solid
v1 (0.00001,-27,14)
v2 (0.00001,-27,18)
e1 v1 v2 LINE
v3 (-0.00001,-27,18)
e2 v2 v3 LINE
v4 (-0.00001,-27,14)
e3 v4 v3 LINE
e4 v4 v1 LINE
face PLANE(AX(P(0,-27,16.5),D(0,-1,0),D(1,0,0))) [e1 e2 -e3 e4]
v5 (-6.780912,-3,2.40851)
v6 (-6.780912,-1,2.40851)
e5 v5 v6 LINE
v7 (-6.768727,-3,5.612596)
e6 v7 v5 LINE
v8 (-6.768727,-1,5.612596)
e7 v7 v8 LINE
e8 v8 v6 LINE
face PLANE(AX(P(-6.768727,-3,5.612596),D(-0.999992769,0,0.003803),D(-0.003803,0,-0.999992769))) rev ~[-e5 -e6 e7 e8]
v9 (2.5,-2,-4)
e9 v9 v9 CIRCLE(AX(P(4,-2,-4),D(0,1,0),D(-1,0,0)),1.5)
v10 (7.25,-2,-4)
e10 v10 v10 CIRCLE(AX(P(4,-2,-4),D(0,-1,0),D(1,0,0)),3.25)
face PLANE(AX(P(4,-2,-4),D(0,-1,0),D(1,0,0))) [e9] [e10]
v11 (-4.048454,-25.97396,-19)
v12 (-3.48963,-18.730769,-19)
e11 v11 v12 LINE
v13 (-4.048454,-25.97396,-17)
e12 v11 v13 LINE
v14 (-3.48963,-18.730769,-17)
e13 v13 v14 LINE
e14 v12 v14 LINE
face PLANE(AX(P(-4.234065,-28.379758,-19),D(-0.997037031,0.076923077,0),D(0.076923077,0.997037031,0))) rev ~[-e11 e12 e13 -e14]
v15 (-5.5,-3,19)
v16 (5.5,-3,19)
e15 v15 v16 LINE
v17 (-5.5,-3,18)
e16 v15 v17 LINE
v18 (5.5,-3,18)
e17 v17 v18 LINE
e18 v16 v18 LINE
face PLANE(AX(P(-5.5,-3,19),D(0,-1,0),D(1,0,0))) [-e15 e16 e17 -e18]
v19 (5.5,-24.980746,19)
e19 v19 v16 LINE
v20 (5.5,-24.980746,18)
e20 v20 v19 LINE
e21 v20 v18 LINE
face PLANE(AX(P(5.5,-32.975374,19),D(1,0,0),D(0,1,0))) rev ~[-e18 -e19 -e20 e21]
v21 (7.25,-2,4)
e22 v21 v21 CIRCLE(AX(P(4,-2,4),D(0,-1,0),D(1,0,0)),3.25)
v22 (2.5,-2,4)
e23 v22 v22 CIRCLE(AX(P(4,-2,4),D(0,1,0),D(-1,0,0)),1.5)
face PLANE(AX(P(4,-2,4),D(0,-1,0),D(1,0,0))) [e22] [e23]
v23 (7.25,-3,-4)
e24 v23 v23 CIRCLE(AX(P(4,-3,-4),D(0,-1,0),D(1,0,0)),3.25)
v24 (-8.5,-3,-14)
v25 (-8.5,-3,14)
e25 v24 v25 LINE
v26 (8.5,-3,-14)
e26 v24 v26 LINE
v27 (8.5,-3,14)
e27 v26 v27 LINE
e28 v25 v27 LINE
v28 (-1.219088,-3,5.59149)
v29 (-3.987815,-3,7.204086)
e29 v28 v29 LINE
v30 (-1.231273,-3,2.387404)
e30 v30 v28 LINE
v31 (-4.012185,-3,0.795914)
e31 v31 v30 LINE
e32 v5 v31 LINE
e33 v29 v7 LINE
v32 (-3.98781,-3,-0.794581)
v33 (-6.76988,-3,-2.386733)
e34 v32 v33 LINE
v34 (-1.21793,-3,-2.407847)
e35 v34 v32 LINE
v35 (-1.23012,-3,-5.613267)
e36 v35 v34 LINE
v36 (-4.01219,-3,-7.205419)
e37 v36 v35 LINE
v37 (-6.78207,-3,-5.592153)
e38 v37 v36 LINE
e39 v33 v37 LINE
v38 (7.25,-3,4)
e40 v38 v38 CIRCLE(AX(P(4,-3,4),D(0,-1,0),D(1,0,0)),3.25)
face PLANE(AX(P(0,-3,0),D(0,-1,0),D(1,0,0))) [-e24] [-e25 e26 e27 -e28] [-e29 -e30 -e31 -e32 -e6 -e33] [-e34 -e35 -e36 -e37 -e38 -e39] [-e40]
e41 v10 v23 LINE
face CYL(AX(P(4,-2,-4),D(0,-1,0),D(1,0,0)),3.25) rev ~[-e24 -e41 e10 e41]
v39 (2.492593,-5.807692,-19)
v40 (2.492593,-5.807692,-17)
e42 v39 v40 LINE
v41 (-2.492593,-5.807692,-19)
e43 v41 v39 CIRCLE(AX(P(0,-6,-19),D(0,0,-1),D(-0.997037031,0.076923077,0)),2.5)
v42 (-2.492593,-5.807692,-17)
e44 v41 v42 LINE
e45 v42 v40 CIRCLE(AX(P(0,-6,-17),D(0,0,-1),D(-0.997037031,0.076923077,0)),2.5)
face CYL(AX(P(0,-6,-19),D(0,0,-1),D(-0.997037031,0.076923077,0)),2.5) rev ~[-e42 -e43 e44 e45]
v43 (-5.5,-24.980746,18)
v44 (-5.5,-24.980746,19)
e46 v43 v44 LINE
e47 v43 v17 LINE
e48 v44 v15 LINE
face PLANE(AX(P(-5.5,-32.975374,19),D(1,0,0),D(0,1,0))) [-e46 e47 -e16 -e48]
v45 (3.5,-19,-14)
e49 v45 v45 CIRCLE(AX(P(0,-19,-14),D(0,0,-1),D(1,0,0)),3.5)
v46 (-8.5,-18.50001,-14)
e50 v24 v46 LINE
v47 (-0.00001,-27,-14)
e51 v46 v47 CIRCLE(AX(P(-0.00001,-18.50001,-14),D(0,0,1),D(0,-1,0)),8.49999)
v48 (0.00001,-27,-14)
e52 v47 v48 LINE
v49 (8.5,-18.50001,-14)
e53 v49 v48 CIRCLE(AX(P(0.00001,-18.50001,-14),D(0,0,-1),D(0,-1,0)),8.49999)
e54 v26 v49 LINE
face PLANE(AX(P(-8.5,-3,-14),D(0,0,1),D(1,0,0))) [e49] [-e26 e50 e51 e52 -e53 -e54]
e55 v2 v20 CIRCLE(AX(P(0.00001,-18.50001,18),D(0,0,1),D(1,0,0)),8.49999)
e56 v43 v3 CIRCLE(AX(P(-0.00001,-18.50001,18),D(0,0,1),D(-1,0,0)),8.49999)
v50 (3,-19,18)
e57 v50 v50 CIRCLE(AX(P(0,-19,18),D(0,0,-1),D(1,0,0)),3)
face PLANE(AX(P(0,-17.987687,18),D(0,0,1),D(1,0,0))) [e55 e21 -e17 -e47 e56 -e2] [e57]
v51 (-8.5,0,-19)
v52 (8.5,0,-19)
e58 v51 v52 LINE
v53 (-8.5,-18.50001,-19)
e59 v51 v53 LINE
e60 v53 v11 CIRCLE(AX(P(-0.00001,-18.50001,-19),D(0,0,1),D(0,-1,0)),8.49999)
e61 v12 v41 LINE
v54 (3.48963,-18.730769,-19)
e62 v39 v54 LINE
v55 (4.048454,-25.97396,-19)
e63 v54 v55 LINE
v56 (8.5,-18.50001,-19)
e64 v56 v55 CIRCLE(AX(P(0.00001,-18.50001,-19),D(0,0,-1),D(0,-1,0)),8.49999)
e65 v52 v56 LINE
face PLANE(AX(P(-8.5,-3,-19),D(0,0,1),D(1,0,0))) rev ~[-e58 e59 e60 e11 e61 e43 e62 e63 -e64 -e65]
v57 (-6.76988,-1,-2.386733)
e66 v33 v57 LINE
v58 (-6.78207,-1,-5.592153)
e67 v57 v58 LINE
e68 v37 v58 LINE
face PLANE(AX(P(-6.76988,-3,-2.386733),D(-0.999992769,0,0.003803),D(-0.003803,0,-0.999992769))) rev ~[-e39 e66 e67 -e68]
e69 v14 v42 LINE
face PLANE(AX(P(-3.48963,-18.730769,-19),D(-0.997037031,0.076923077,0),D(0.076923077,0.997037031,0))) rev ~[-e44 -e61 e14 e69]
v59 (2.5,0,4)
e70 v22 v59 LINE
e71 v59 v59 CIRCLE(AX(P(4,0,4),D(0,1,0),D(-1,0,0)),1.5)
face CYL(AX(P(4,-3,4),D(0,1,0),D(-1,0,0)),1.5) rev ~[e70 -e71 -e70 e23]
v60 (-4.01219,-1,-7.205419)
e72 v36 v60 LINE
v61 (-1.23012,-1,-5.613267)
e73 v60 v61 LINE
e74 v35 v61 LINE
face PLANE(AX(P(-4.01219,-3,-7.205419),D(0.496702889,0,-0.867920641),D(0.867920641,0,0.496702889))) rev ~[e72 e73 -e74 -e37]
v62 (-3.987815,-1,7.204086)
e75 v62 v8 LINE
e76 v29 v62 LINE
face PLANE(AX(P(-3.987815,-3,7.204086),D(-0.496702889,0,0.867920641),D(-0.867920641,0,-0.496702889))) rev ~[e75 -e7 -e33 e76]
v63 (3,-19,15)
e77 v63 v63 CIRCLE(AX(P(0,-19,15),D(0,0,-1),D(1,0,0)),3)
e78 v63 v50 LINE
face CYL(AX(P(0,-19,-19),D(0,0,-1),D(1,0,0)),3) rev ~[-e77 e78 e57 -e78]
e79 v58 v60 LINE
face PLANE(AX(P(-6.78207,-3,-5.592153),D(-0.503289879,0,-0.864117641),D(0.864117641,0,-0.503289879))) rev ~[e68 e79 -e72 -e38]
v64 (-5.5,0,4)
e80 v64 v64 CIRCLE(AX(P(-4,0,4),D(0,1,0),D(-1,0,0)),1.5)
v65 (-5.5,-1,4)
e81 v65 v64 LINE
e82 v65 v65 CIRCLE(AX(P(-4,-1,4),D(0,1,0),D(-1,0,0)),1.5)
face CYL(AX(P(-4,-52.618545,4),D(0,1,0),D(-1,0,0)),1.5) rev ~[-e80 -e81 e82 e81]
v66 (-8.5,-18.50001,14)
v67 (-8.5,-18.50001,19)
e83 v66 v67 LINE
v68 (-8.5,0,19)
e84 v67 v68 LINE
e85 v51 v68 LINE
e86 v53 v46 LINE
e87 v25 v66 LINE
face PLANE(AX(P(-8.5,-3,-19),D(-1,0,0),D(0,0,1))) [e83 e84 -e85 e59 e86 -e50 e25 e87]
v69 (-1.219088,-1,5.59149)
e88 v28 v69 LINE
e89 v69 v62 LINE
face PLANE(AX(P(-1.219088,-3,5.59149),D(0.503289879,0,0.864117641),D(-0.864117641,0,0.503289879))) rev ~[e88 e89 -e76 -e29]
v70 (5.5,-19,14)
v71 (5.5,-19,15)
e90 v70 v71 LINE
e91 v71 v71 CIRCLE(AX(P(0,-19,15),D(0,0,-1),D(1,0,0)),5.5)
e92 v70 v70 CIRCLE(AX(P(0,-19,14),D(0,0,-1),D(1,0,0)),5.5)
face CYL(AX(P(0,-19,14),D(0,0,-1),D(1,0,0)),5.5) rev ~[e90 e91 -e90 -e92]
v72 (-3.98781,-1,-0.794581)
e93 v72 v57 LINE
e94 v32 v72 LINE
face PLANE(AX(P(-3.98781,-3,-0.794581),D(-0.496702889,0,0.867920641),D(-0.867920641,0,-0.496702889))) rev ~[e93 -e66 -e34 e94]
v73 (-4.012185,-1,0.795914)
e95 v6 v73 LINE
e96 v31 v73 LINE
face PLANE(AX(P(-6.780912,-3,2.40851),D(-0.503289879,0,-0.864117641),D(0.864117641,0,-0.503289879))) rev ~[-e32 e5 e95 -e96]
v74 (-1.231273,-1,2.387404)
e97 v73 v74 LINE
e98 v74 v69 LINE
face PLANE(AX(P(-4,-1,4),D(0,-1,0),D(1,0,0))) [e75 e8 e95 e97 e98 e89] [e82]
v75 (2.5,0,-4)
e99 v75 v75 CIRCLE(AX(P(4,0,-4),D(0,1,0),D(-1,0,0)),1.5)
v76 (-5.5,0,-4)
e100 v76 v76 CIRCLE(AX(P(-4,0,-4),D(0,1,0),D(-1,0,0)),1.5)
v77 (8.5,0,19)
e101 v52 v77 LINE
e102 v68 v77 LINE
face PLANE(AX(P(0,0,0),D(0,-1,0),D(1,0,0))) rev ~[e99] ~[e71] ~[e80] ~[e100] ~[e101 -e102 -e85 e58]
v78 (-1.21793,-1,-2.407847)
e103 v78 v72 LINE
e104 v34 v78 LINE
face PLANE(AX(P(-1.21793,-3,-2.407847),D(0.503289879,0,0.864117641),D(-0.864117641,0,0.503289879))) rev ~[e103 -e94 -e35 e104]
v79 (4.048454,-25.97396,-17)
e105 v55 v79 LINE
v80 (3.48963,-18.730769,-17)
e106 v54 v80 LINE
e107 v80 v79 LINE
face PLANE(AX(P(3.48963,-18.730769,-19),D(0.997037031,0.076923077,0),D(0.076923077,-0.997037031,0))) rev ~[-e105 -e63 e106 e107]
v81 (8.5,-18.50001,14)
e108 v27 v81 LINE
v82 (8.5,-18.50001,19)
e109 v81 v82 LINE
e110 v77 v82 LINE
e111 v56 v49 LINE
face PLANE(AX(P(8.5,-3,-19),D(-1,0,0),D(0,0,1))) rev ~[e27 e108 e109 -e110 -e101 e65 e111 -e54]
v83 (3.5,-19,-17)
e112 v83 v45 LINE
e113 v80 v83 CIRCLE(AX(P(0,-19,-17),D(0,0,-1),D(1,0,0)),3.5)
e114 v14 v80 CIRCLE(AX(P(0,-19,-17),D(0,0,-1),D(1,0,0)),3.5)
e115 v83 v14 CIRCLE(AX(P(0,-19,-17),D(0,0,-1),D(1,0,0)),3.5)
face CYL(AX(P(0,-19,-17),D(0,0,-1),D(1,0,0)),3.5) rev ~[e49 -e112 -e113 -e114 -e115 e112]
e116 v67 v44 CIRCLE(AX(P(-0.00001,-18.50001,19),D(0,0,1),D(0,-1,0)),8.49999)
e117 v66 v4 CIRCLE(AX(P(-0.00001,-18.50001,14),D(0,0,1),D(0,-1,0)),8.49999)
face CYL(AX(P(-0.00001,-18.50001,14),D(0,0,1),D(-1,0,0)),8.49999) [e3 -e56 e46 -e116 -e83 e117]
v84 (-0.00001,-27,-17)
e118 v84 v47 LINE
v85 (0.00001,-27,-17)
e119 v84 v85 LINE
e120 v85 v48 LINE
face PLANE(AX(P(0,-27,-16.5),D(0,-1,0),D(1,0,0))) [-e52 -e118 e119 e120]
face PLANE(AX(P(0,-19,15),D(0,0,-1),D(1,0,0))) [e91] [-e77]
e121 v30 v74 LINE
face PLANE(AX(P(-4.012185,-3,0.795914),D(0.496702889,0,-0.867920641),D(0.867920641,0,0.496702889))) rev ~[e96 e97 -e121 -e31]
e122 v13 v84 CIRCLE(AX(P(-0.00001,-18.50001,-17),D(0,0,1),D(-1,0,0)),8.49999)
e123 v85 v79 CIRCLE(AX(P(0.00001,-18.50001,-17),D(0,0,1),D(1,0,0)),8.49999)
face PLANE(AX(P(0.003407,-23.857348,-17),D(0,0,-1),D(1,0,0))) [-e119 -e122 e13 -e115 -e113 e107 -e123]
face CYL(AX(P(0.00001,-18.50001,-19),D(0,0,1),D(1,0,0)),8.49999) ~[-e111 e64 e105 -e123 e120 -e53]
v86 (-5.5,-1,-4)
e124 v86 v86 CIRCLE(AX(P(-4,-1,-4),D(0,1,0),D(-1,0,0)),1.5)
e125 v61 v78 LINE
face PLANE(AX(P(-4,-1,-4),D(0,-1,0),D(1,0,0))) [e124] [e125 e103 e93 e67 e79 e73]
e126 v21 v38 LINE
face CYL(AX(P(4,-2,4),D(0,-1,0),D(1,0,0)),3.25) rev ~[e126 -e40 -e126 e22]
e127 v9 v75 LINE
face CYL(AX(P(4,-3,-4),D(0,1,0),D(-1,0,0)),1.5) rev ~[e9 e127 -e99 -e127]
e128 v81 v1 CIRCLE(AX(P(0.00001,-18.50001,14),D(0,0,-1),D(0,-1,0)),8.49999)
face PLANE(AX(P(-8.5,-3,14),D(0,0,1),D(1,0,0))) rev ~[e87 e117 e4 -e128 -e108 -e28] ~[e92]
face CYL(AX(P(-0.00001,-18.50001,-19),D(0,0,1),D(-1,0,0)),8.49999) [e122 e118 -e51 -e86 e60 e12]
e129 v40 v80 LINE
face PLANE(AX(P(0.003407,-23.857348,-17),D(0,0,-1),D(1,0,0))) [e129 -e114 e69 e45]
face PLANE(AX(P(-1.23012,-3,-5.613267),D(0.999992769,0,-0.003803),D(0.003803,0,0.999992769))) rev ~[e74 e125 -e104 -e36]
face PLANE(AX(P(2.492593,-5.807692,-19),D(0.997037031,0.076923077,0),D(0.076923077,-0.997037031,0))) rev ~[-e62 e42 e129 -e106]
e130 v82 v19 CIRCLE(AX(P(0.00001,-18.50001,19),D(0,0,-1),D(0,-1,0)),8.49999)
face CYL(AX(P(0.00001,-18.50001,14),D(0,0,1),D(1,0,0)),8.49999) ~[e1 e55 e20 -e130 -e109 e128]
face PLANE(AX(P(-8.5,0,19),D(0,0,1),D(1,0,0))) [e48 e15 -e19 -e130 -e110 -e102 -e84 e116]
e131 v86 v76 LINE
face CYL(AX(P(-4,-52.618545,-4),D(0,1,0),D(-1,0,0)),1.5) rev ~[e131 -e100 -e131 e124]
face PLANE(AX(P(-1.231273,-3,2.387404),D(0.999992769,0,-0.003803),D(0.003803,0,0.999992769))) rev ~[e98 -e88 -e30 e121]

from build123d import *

# Parameters (mm, degrees)
F0_W            = 17
F0_H            = 38
F1_DEPTH        = 3
F2_W            = 17
F2_H            = 5
F3_DEPTH        = 24
F4_R            = 8.49999
F5_R            = 3
F6_DEPTH        = 40
F7_W            = 11
F7_H            = 29.9753743202
F8_DEPTH        = 1
F10_DEPTH       = 2
F11_R           = 5.5
F12_DEPTH       = 1
F14_D           = 1
F14_DEPTH       = 20
F14_TIP         = 0.3004303095
F16_D           = 3
F16_DEPTH       = 20
F16_CBORE_D     = 6.5
F16_CBORE_DEPTH = 1
F16_TIP         = 0.9012909285
F18_R           = 3.5
F19_DEPTH       = 25
F21_DEPTH       = 2
F22_D           = 3


# Not quite as in the source:
# - a fillet or chamfer is up to 0.001 mm smaller than in the source, because OpenCascade refuses the exact size
# - a feature names something its author has since deleted; it is built from what else it names


with BuildPart() as f1:
    # F0 (on Front) → F1 (new body)
    with BuildSketch(Plane.XZ):
        Rectangle(F0_W, F0_H)
    extrude(amount=F1_DEPTH)

    # F2 (on face) → F3 (join)
    with BuildSketch(Plane.XZ.offset(3)):
        with Locations((0, -16.5)):
            Rectangle(F2_W, F2_H)
        with Locations((0, 16.5)):
            Rectangle(F2_W, F2_H)
    extrude(amount=F3_DEPTH)

    # F4 (radius 8.5 in the source; OpenCascade refuses exactly that, so slightly less here)
    f4_edges = [f1.edges().sort_by_distance(p)[0] for p in [
        (8.5, -27, -16.5),
        (-8.5, -27, -16.5),
        (8.5, -27, 16.5),
        (-8.5, -27, 16.5),
    ]]
    fillet(f4_edges, radius=F4_R)

    # F5 (on face) → F6 (cut)
    with BuildSketch(Plane(origin=(0, 0, -19), x_dir=(1, 0, 0), z_dir=(0, 0, -1))):
        with Locations((0, 19)):
            Circle(F5_R)
    extrude(amount=-F6_DEPTH, mode=Mode.SUBTRACT)

    # F7 (on face) → F8 (cut)
    with BuildSketch(Plane.XY.offset(19)):
        with Locations((0, -17.9876871601)):
            Rectangle(F7_W, F7_H)
    extrude(amount=-F8_DEPTH, mode=Mode.SUBTRACT)

    # F9 (on face) → F10 (cut)
    with BuildSketch(Plane(origin=(0, 0, -19), x_dir=(1, 0, 0), z_dir=(0, 0, -1))):
        with BuildLine():
            Line((4.2340652424, 28.3797578726), (-4.2340652424, 28.3797578726))
            Line((-4.2340652424, 28.3797578726), (-3.4896296074, 18.730769238))
            ThreePointArc((-3.4896296074, 18.730769238), (-0.1347152072, 22.4974064409), (3.5, 19))
            ThreePointArc((3.5, 19), (3.4974064409, 18.8652847928), (3.4896296074, 18.730769238))
            Line((3.4896296074, 18.730769238), (4.2340652424, 28.3797578726))
        make_face()
        with BuildLine():
            ThreePointArc((3.4896296074, 18.730769238), (0, 15.5), (-3.4896296074, 18.730769238))
            Line((-3.4896296074, 18.730769238), (-2.4925925763, 5.8076923077))
            ThreePointArc((-2.4925925763, 5.8076923077), (0, 3.5), (2.4925925763, 5.8076923077))
            Line((2.4925925763, 5.8076923077), (3.4896296074, 18.730769238))
        make_face()
        with BuildLine():
            ThreePointArc((3.5, 19), (-0.1347152072, 22.4974064409), (-3.4896296074, 18.730769238))
            ThreePointArc((-3.4896296074, 18.730769238), (0, 15.5), (3.4896296074, 18.730769238))
            ThreePointArc((3.4896296074, 18.730769238), (3.4974064409, 18.8652847928), (3.5, 19))
        make_face()
    extrude(amount=-F10_DEPTH, mode=Mode.SUBTRACT)

    # F11 (on face) → F12 (cut)
    with BuildSketch(Plane(origin=(0, 0, 14), x_dir=(1, 0, 0), z_dir=(0, 0, -1))):
        with Locations((0, 19)):
            Circle(F11_R)
    extrude(amount=-F12_DEPTH, mode=Mode.SUBTRACT)

    # F14
    with Locations(Plane(origin=(0, 0, 0), x_dir=(-1, 0, 0), z_dir=(0, 1, 0))):
        with Locations((-4, 4), (-4, -4)):
            Hole(F14_D / 2, depth=F14_DEPTH)
            with Locations((0, 0, -(F14_DEPTH + F14_TIP / 2))):  # 118° drill point
                Cone(0, F14_D / 2, F14_TIP, mode=Mode.SUBTRACT)

    # F16
    with Locations(Plane.XZ.offset(3)):
        with Locations((4, 4), (4, -4)):
            CounterBoreHole(F16_D / 2, F16_CBORE_D / 2, F16_CBORE_DEPTH, depth=F16_DEPTH)
            with Locations((0, 0, -(F16_DEPTH + F16_TIP / 2))):  # 118° drill point
                Cone(0, F16_D / 2, F16_TIP, mode=Mode.SUBTRACT)

    # F18 (on face) → F19 (cut)
    with BuildSketch(Plane(origin=(0, 0, -17), x_dir=(1, 0, 0), z_dir=(0, 0, -1))):
        with Locations((0, 19)):
            Circle(F18_R)
    extrude(amount=-F19_DEPTH, mode=Mode.SUBTRACT)

    # F20 (on face) → F21 (cut)
    with BuildSketch(Plane.XZ.offset(3)):
        Polygon((-1.2190877389, 5.5914901538), (-3.9878147725, 7.2040857407), (-6.7687270336, 5.6125955869), (-6.7809122611, 2.4085098462), (-4.0121852275, 0.7959142593), (-1.2312729664, 2.3874044131), align=None)
        Polygon((-1.2179301405, -2.4078473634), (-3.9878097002, -0.7945805083), (-6.7698795597, -2.3867331448), (-6.7820698595, -5.5921526366), (-4.0121902998, -7.2054194917), (-1.2301204403, -5.6132668552), align=None)
    extrude(amount=-F21_DEPTH, mode=Mode.SUBTRACT)

    # F22 (through all)
    with Locations(Plane.XZ.offset(3)):
        with Locations((-4, 4), (-4, -4)):
            Hole(F22_D / 2)


solid = f1.part
